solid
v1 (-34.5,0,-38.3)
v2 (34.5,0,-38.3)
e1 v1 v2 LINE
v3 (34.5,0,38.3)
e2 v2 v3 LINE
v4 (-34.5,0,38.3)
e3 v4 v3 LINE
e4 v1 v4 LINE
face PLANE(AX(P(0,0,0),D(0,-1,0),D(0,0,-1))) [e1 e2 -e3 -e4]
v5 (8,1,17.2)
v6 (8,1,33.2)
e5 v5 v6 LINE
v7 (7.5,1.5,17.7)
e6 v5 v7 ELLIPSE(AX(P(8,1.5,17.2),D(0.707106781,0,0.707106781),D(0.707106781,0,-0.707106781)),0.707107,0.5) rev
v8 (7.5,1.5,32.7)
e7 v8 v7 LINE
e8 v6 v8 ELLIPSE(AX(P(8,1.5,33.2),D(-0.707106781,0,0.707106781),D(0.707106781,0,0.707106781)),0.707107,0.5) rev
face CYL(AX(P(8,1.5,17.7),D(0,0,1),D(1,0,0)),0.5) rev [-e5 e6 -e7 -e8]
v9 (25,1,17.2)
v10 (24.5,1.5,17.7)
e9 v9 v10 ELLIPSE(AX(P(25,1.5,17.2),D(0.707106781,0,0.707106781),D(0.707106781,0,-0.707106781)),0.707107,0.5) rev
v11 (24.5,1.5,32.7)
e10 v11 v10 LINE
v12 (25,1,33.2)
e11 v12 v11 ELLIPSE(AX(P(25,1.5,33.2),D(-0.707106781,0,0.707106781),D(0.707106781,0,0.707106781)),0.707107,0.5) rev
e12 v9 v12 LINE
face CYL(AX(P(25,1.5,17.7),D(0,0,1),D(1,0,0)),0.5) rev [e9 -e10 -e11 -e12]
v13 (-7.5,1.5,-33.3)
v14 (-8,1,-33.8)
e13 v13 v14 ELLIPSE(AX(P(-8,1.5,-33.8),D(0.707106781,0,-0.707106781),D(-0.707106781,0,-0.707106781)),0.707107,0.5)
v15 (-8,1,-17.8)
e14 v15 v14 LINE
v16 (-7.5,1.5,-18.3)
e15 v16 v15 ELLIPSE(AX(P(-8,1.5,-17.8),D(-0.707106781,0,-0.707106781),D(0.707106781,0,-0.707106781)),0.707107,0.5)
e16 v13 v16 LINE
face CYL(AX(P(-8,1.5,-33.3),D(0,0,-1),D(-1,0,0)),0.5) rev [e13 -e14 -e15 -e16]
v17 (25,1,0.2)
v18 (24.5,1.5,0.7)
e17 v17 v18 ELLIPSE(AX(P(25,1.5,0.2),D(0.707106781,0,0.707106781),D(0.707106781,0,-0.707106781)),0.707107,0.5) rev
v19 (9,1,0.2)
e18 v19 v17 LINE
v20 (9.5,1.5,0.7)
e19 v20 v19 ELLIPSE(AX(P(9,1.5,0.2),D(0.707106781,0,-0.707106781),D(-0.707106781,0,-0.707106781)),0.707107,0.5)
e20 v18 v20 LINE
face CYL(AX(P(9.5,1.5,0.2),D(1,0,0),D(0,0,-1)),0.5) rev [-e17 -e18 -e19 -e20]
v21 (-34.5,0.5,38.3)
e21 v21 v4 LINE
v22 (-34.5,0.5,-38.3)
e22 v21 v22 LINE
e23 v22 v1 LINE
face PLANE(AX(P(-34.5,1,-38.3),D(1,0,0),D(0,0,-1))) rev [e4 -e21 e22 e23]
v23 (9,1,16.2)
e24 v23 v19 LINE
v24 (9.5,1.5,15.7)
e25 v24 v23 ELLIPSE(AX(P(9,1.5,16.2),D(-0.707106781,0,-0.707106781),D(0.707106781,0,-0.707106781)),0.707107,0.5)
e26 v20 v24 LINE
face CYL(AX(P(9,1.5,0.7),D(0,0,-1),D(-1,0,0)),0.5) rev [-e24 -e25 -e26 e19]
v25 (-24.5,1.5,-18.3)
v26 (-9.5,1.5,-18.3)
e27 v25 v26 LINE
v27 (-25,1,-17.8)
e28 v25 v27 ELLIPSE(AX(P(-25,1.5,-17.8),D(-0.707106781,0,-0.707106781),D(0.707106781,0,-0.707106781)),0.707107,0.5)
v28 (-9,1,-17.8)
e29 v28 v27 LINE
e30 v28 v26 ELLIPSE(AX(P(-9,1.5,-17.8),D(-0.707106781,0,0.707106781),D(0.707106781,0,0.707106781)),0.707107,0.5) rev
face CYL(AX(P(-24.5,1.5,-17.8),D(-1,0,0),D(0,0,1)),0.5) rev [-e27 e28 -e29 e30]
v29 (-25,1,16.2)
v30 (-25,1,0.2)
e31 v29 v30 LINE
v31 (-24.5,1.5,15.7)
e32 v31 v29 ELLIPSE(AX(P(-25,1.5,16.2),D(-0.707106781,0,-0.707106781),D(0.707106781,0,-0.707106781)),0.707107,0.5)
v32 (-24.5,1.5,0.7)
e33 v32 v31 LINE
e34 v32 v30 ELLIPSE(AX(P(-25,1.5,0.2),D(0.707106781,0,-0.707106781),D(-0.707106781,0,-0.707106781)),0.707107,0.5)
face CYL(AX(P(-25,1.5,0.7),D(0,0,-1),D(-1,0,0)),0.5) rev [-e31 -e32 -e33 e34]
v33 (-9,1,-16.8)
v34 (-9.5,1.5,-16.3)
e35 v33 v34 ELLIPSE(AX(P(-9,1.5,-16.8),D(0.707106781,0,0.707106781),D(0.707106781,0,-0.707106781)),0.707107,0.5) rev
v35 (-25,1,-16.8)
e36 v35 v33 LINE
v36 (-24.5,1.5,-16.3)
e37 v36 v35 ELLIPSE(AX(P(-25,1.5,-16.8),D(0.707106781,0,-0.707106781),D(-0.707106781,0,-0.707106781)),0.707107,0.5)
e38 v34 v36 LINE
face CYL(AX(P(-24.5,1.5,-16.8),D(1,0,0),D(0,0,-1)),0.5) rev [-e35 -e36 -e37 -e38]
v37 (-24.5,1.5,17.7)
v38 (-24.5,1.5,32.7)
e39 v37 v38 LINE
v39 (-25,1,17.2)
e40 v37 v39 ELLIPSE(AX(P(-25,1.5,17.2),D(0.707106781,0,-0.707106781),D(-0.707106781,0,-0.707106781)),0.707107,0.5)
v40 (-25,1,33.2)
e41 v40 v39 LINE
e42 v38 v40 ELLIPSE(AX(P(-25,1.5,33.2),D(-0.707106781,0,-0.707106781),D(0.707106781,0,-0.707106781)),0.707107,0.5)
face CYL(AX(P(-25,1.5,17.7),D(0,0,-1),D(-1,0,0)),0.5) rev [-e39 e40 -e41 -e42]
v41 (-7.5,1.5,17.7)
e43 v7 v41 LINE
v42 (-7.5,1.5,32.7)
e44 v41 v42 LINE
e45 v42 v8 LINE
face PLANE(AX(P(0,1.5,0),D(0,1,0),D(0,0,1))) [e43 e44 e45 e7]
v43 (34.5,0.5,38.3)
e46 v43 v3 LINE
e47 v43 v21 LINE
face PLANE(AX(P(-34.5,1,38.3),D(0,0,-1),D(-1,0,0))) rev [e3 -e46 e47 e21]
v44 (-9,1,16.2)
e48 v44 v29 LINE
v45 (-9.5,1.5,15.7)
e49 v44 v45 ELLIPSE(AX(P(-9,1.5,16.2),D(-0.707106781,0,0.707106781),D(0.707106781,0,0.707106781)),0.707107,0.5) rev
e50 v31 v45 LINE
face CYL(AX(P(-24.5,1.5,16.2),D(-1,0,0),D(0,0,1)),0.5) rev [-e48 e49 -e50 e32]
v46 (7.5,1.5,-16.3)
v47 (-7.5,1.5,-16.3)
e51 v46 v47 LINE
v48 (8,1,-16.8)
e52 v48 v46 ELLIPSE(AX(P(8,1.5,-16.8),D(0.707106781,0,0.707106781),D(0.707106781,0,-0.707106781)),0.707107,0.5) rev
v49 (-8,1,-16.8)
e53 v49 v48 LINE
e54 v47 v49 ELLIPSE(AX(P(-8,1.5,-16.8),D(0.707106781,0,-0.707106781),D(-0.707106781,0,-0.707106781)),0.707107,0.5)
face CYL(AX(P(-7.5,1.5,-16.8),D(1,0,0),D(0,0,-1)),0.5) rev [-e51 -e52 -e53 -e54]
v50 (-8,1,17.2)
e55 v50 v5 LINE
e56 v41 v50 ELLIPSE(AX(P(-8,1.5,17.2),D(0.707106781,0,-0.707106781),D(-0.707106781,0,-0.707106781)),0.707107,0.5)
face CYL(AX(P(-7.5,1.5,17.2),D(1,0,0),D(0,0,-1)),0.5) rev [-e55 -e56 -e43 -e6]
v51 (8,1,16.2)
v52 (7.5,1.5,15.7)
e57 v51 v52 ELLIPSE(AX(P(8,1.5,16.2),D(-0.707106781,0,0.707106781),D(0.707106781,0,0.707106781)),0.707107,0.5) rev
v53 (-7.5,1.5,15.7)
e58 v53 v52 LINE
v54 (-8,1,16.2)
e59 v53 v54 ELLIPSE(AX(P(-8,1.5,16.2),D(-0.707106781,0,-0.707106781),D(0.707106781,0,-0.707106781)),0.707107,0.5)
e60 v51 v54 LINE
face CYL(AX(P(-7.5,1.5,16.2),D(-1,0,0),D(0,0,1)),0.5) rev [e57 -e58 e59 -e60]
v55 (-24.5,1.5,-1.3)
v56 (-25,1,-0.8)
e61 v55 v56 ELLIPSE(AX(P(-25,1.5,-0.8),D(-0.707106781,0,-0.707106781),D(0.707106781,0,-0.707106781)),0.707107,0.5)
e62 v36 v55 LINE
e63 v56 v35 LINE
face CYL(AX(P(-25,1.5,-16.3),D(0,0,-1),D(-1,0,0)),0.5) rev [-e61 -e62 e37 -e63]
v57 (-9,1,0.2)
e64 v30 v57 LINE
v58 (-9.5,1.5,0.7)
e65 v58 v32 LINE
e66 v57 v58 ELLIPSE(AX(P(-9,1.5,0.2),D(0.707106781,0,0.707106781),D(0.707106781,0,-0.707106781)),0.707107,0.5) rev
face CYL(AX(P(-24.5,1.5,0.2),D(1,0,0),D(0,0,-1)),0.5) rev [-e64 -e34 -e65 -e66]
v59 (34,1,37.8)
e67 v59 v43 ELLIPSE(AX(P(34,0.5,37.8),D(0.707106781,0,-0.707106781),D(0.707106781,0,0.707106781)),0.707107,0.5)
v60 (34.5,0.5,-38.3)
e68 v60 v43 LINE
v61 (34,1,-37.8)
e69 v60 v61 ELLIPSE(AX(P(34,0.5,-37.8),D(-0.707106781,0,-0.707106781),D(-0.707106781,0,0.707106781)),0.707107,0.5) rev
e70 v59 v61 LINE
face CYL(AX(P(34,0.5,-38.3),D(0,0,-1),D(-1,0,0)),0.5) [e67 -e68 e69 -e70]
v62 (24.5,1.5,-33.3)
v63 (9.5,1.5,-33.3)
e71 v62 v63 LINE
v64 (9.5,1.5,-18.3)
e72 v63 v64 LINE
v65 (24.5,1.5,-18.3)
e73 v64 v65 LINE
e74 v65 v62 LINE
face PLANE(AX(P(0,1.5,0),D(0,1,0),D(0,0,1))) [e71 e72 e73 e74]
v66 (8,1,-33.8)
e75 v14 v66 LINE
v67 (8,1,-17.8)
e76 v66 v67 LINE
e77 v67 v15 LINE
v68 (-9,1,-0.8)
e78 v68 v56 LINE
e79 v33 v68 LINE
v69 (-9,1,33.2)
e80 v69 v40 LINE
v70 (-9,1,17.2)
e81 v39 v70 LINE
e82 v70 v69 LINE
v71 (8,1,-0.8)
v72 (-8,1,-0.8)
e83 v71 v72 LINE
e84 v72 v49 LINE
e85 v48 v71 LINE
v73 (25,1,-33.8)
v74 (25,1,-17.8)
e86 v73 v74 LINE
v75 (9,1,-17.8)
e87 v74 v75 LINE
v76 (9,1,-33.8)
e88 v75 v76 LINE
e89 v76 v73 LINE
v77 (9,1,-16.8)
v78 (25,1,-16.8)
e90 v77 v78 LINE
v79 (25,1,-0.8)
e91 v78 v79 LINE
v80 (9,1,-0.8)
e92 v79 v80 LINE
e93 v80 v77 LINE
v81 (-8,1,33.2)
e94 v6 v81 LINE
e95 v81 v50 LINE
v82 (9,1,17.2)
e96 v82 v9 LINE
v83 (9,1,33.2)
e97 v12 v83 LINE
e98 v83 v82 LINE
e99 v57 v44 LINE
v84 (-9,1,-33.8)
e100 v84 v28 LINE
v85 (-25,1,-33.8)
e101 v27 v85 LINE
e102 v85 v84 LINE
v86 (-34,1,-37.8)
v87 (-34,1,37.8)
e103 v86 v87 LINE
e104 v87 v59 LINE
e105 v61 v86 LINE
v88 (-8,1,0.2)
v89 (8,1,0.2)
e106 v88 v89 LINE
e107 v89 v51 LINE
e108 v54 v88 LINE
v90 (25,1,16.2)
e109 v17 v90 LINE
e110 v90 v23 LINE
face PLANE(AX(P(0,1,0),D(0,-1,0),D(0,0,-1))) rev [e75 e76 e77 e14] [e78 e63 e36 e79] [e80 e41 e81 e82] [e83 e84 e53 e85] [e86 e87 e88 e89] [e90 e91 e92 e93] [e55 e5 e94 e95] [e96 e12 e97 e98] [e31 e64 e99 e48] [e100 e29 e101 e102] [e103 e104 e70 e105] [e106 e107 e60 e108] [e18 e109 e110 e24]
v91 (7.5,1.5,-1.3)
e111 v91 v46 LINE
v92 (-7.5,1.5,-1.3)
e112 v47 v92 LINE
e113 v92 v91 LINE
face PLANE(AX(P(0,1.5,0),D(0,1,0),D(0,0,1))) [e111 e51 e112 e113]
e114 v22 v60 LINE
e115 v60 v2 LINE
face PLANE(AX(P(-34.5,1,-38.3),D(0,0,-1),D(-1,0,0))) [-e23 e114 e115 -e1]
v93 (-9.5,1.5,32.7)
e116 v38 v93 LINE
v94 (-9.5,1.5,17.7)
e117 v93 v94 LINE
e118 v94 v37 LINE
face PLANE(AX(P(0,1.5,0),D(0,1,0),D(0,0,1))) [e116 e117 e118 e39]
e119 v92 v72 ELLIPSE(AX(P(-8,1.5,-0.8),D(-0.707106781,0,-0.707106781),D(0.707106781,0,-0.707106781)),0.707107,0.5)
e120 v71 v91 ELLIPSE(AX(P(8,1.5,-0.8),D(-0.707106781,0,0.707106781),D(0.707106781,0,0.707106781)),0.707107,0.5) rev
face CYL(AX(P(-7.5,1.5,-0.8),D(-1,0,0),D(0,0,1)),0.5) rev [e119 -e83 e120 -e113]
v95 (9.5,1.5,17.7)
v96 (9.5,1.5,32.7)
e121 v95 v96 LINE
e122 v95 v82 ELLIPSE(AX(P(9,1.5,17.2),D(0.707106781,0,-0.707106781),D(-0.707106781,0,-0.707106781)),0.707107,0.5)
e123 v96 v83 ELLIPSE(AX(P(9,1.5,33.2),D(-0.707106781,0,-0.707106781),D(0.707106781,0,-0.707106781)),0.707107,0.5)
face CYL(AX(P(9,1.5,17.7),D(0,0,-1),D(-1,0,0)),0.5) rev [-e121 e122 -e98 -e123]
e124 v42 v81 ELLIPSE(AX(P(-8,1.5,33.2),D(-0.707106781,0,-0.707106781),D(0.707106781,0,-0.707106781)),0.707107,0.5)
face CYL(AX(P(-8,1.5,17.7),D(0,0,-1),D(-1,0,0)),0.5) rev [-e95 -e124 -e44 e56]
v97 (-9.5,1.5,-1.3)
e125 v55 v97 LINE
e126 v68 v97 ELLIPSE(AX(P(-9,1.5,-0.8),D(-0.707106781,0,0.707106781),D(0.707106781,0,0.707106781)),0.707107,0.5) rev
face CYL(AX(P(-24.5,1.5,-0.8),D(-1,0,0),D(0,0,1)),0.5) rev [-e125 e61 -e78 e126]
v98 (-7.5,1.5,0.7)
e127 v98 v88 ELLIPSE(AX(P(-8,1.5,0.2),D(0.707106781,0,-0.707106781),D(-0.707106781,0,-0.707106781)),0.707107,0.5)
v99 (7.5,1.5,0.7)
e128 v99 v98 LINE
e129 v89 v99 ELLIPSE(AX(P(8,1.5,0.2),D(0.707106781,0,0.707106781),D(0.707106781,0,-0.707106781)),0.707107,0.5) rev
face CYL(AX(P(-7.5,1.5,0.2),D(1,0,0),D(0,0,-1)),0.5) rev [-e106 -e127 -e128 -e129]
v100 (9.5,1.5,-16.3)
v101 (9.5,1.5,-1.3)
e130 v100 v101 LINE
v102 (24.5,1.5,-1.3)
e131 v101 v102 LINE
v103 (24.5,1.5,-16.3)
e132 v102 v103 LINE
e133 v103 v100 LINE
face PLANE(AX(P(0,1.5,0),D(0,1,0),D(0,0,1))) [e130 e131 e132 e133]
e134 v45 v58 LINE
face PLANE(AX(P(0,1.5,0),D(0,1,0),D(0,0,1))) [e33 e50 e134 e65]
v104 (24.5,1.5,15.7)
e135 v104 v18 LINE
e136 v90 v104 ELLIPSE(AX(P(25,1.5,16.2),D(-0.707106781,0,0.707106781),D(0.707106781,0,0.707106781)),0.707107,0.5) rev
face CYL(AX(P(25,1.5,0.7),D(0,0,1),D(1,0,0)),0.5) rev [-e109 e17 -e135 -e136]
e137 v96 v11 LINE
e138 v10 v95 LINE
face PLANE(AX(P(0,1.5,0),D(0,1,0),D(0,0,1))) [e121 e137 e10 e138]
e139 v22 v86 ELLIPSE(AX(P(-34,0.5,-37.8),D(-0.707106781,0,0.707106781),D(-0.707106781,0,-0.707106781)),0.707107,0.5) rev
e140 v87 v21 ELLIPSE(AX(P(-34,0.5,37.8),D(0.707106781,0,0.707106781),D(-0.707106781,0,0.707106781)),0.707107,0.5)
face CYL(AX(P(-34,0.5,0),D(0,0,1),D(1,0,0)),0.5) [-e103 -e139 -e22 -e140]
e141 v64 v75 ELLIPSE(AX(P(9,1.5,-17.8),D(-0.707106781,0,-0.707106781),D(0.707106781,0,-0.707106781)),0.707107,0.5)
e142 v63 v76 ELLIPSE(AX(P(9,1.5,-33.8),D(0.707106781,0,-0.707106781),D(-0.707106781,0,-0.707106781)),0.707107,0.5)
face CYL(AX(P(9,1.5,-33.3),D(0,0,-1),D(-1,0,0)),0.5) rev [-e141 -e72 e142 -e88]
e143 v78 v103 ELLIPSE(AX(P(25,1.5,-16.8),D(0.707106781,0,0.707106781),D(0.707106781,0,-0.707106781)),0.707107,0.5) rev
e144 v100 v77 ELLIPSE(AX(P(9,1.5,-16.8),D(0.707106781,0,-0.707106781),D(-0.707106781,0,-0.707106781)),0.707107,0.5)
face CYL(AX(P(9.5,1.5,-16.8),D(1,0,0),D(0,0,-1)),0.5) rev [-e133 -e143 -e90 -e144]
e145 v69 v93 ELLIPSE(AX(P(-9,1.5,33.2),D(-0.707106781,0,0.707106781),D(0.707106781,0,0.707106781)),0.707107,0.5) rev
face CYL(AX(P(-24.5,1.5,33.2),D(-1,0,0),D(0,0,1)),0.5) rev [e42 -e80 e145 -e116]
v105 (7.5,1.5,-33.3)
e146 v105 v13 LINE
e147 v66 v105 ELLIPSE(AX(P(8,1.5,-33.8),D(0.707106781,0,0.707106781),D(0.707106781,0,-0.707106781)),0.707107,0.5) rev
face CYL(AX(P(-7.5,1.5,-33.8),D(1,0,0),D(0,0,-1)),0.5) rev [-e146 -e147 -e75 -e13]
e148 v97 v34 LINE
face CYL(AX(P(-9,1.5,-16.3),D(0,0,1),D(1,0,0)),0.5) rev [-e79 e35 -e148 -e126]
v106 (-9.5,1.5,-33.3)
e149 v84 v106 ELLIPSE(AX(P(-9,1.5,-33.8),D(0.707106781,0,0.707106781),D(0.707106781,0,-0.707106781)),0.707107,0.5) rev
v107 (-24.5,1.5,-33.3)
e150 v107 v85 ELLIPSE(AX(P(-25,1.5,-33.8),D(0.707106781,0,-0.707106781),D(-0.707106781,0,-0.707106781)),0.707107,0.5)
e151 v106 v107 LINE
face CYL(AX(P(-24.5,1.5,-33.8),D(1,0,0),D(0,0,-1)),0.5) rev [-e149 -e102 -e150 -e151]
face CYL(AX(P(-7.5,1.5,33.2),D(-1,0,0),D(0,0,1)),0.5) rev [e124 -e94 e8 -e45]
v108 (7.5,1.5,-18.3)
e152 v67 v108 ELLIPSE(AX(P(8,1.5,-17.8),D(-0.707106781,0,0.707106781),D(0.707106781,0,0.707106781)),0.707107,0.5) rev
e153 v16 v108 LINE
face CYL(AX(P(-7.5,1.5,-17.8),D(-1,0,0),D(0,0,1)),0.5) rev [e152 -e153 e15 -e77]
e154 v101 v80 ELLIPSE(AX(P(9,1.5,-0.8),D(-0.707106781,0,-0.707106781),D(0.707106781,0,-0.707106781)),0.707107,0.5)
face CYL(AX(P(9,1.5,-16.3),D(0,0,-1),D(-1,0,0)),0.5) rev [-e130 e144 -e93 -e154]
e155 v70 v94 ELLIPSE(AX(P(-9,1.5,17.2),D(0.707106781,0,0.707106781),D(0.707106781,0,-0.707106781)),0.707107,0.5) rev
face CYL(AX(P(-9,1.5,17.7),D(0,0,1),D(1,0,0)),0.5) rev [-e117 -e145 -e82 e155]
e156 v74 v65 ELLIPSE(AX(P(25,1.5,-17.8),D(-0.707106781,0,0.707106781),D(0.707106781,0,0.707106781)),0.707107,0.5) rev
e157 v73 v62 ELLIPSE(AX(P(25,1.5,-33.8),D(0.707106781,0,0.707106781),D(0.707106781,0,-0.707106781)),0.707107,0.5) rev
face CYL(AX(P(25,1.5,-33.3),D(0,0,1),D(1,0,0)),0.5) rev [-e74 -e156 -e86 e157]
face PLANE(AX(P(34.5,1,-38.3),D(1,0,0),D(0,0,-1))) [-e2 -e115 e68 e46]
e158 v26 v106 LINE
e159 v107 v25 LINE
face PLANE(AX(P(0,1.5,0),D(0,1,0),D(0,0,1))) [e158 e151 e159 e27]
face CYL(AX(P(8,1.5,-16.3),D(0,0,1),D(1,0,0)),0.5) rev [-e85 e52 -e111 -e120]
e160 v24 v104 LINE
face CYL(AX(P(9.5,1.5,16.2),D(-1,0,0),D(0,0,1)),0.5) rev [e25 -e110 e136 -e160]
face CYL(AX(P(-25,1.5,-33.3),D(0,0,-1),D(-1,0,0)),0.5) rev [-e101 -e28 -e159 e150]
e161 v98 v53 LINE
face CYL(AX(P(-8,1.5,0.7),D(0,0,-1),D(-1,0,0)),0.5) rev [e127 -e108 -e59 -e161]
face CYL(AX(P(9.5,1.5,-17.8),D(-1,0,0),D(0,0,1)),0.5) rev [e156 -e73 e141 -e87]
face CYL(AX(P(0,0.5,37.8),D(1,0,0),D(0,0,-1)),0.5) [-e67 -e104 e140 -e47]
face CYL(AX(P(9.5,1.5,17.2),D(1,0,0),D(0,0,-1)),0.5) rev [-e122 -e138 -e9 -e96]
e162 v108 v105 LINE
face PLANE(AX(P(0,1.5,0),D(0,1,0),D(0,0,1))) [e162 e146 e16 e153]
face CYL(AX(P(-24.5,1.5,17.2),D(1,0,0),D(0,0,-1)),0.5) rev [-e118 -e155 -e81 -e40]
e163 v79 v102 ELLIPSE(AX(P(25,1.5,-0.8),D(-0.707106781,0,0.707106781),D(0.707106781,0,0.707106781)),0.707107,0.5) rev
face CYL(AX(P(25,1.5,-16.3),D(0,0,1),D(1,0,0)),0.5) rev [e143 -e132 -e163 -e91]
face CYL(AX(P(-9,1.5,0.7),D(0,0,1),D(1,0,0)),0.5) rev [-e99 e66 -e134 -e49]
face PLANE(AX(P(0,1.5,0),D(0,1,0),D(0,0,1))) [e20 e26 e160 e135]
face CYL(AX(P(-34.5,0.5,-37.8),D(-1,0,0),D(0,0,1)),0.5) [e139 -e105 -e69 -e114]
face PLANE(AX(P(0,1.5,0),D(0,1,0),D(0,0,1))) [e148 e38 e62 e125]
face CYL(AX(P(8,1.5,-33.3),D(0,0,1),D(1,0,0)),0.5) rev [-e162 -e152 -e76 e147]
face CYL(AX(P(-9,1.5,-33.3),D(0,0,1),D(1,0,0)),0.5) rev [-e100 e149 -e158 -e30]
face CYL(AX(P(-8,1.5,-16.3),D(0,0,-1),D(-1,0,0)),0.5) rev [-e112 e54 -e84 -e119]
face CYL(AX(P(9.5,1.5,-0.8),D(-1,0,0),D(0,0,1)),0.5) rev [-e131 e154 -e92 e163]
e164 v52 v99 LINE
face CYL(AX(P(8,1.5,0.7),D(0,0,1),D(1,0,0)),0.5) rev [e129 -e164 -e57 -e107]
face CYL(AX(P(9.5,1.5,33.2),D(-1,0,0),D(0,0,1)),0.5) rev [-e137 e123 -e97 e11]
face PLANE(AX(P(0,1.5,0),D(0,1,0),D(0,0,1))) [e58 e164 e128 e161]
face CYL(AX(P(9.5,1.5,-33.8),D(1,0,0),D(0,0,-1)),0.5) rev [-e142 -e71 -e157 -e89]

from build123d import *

# Parameters (mm, degrees)
SKETCH1_W           = 69
SKETCH1_H           = 76.6
BOSS_EXTRUDE1_DEPTH = 1
SKETCH2_W           = 15
SKETCH2_H           = 15
BOSS_EXTRUDE2_DEPTH = 0.5
FILLET1_R           = 0.5


with BuildPart() as part:
    # Sketch1 → Boss-Extrude1 (new body)
    with BuildSketch(Plane(origin=(0, 0, 0), x_dir=(1, 0, 0), z_dir=(0, 1, 0))):
        Rectangle(SKETCH1_W, SKETCH1_H)
    extrude(amount=BOSS_EXTRUDE1_DEPTH)

    # Sketch2 → Boss-Extrude2 (add)
    with BuildSketch(Plane(origin=(0, 1, 0), x_dir=(1, 0, 0), z_dir=(0, 1, 0))):
        with Locations((-17, 8.8)):
            Rectangle(SKETCH2_W, SKETCH2_H)
        with Locations((-17, 25.8)):
            Rectangle(SKETCH2_W, SKETCH2_H)
        with Locations((0, 25.8)):
            Rectangle(SKETCH2_W, SKETCH2_H)
        with Locations((17, 25.8)):
            Rectangle(SKETCH2_W, SKETCH2_H)
        with Locations((0, 8.8)):
            Rectangle(SKETCH2_W, SKETCH2_H)
        with Locations((17, 8.8)):
            Rectangle(SKETCH2_W, SKETCH2_H)
        with Locations((-17, -8.2)):
            Rectangle(SKETCH2_W, SKETCH2_H)
        with Locations((0, -8.2)):
            Rectangle(SKETCH2_W, SKETCH2_H)
        with Locations((17, -8.2)):
            Rectangle(SKETCH2_W, SKETCH2_H)
        with Locations((-17, -25.2)):
            Rectangle(SKETCH2_W, SKETCH2_H)
        with Locations((0, -25.2)):
            Rectangle(SKETCH2_W, SKETCH2_H)
        with Locations((17, -25.2)):
            Rectangle(SKETCH2_W, SKETCH2_H)
    extrude(amount=BOSS_EXTRUDE2_DEPTH)

    # Fillet1
    fillet1_edges = [part.edges().sort_by_distance(p)[0] for p in [
        (17, 1, 32.7),
        (24.5, 1, 25.2),
        (17, 1, 17.7),
        (9.5, 1, 25.2),
        (-17, 1, 32.7),
        (-9.5, 1, 25.2),
        (-17, 1, 17.7),
        (-24.5, 1, 25.2),
        (0, 1, 15.7),
        (7.5, 1, 8.2),
        (0, 1, 0.7),
        (-7.5, 1, 8.2),
        (17, 1, -1.3),
        (24.5, 1, -8.8),
        (17, 1, -16.3),
        (9.5, 1, -8.8),
        (-17, 1, -1.3),
        (-9.5, 1, -8.8),
        (-17, 1, -16.3),
        (-24.5, 1, -8.8),
        (0, 1, -18.3),
        (7.5, 1, -25.8),
        (0, 1, -33.3),
        (-7.5, 1, -25.8),
        (34.5, 1, 0),
        (0, 1, 38.3),
        (-34.5, 1, 0),
        (0, 1, -38.3),
        (-17, 1, -18.3),
        (-9.5, 1, -25.8),
        (-17, 1, -33.3),
        (-24.5, 1, -25.8),
        (17, 1, -18.3),
        (24.5, 1, -25.8),
        (17, 1, -33.3),
        (9.5, 1, -25.8),
        (0, 1, -1.3),
        (7.5, 1, -8.8),
        (0, 1, -16.3),
        (-7.5, 1, -8.8),
        (-17, 1, 15.7),
        (-9.5, 1, 8.2),
        (-17, 1, 0.7),
        (-24.5, 1, 8.2),
        (17, 1, 15.7),
        (24.5, 1, 8.2),
        (17, 1, 0.7),
        (9.5, 1, 8.2),
        (0, 1, 32.7),
        (7.5, 1, 25.2),
        (0, 1, 17.7),
        (-7.5, 1, 25.2),
    ]]
    fillet(fillet1_edges, radius=FILLET1_R - 0.0001)  # a hair under: the kernel refuses the full size


solid = part.part
